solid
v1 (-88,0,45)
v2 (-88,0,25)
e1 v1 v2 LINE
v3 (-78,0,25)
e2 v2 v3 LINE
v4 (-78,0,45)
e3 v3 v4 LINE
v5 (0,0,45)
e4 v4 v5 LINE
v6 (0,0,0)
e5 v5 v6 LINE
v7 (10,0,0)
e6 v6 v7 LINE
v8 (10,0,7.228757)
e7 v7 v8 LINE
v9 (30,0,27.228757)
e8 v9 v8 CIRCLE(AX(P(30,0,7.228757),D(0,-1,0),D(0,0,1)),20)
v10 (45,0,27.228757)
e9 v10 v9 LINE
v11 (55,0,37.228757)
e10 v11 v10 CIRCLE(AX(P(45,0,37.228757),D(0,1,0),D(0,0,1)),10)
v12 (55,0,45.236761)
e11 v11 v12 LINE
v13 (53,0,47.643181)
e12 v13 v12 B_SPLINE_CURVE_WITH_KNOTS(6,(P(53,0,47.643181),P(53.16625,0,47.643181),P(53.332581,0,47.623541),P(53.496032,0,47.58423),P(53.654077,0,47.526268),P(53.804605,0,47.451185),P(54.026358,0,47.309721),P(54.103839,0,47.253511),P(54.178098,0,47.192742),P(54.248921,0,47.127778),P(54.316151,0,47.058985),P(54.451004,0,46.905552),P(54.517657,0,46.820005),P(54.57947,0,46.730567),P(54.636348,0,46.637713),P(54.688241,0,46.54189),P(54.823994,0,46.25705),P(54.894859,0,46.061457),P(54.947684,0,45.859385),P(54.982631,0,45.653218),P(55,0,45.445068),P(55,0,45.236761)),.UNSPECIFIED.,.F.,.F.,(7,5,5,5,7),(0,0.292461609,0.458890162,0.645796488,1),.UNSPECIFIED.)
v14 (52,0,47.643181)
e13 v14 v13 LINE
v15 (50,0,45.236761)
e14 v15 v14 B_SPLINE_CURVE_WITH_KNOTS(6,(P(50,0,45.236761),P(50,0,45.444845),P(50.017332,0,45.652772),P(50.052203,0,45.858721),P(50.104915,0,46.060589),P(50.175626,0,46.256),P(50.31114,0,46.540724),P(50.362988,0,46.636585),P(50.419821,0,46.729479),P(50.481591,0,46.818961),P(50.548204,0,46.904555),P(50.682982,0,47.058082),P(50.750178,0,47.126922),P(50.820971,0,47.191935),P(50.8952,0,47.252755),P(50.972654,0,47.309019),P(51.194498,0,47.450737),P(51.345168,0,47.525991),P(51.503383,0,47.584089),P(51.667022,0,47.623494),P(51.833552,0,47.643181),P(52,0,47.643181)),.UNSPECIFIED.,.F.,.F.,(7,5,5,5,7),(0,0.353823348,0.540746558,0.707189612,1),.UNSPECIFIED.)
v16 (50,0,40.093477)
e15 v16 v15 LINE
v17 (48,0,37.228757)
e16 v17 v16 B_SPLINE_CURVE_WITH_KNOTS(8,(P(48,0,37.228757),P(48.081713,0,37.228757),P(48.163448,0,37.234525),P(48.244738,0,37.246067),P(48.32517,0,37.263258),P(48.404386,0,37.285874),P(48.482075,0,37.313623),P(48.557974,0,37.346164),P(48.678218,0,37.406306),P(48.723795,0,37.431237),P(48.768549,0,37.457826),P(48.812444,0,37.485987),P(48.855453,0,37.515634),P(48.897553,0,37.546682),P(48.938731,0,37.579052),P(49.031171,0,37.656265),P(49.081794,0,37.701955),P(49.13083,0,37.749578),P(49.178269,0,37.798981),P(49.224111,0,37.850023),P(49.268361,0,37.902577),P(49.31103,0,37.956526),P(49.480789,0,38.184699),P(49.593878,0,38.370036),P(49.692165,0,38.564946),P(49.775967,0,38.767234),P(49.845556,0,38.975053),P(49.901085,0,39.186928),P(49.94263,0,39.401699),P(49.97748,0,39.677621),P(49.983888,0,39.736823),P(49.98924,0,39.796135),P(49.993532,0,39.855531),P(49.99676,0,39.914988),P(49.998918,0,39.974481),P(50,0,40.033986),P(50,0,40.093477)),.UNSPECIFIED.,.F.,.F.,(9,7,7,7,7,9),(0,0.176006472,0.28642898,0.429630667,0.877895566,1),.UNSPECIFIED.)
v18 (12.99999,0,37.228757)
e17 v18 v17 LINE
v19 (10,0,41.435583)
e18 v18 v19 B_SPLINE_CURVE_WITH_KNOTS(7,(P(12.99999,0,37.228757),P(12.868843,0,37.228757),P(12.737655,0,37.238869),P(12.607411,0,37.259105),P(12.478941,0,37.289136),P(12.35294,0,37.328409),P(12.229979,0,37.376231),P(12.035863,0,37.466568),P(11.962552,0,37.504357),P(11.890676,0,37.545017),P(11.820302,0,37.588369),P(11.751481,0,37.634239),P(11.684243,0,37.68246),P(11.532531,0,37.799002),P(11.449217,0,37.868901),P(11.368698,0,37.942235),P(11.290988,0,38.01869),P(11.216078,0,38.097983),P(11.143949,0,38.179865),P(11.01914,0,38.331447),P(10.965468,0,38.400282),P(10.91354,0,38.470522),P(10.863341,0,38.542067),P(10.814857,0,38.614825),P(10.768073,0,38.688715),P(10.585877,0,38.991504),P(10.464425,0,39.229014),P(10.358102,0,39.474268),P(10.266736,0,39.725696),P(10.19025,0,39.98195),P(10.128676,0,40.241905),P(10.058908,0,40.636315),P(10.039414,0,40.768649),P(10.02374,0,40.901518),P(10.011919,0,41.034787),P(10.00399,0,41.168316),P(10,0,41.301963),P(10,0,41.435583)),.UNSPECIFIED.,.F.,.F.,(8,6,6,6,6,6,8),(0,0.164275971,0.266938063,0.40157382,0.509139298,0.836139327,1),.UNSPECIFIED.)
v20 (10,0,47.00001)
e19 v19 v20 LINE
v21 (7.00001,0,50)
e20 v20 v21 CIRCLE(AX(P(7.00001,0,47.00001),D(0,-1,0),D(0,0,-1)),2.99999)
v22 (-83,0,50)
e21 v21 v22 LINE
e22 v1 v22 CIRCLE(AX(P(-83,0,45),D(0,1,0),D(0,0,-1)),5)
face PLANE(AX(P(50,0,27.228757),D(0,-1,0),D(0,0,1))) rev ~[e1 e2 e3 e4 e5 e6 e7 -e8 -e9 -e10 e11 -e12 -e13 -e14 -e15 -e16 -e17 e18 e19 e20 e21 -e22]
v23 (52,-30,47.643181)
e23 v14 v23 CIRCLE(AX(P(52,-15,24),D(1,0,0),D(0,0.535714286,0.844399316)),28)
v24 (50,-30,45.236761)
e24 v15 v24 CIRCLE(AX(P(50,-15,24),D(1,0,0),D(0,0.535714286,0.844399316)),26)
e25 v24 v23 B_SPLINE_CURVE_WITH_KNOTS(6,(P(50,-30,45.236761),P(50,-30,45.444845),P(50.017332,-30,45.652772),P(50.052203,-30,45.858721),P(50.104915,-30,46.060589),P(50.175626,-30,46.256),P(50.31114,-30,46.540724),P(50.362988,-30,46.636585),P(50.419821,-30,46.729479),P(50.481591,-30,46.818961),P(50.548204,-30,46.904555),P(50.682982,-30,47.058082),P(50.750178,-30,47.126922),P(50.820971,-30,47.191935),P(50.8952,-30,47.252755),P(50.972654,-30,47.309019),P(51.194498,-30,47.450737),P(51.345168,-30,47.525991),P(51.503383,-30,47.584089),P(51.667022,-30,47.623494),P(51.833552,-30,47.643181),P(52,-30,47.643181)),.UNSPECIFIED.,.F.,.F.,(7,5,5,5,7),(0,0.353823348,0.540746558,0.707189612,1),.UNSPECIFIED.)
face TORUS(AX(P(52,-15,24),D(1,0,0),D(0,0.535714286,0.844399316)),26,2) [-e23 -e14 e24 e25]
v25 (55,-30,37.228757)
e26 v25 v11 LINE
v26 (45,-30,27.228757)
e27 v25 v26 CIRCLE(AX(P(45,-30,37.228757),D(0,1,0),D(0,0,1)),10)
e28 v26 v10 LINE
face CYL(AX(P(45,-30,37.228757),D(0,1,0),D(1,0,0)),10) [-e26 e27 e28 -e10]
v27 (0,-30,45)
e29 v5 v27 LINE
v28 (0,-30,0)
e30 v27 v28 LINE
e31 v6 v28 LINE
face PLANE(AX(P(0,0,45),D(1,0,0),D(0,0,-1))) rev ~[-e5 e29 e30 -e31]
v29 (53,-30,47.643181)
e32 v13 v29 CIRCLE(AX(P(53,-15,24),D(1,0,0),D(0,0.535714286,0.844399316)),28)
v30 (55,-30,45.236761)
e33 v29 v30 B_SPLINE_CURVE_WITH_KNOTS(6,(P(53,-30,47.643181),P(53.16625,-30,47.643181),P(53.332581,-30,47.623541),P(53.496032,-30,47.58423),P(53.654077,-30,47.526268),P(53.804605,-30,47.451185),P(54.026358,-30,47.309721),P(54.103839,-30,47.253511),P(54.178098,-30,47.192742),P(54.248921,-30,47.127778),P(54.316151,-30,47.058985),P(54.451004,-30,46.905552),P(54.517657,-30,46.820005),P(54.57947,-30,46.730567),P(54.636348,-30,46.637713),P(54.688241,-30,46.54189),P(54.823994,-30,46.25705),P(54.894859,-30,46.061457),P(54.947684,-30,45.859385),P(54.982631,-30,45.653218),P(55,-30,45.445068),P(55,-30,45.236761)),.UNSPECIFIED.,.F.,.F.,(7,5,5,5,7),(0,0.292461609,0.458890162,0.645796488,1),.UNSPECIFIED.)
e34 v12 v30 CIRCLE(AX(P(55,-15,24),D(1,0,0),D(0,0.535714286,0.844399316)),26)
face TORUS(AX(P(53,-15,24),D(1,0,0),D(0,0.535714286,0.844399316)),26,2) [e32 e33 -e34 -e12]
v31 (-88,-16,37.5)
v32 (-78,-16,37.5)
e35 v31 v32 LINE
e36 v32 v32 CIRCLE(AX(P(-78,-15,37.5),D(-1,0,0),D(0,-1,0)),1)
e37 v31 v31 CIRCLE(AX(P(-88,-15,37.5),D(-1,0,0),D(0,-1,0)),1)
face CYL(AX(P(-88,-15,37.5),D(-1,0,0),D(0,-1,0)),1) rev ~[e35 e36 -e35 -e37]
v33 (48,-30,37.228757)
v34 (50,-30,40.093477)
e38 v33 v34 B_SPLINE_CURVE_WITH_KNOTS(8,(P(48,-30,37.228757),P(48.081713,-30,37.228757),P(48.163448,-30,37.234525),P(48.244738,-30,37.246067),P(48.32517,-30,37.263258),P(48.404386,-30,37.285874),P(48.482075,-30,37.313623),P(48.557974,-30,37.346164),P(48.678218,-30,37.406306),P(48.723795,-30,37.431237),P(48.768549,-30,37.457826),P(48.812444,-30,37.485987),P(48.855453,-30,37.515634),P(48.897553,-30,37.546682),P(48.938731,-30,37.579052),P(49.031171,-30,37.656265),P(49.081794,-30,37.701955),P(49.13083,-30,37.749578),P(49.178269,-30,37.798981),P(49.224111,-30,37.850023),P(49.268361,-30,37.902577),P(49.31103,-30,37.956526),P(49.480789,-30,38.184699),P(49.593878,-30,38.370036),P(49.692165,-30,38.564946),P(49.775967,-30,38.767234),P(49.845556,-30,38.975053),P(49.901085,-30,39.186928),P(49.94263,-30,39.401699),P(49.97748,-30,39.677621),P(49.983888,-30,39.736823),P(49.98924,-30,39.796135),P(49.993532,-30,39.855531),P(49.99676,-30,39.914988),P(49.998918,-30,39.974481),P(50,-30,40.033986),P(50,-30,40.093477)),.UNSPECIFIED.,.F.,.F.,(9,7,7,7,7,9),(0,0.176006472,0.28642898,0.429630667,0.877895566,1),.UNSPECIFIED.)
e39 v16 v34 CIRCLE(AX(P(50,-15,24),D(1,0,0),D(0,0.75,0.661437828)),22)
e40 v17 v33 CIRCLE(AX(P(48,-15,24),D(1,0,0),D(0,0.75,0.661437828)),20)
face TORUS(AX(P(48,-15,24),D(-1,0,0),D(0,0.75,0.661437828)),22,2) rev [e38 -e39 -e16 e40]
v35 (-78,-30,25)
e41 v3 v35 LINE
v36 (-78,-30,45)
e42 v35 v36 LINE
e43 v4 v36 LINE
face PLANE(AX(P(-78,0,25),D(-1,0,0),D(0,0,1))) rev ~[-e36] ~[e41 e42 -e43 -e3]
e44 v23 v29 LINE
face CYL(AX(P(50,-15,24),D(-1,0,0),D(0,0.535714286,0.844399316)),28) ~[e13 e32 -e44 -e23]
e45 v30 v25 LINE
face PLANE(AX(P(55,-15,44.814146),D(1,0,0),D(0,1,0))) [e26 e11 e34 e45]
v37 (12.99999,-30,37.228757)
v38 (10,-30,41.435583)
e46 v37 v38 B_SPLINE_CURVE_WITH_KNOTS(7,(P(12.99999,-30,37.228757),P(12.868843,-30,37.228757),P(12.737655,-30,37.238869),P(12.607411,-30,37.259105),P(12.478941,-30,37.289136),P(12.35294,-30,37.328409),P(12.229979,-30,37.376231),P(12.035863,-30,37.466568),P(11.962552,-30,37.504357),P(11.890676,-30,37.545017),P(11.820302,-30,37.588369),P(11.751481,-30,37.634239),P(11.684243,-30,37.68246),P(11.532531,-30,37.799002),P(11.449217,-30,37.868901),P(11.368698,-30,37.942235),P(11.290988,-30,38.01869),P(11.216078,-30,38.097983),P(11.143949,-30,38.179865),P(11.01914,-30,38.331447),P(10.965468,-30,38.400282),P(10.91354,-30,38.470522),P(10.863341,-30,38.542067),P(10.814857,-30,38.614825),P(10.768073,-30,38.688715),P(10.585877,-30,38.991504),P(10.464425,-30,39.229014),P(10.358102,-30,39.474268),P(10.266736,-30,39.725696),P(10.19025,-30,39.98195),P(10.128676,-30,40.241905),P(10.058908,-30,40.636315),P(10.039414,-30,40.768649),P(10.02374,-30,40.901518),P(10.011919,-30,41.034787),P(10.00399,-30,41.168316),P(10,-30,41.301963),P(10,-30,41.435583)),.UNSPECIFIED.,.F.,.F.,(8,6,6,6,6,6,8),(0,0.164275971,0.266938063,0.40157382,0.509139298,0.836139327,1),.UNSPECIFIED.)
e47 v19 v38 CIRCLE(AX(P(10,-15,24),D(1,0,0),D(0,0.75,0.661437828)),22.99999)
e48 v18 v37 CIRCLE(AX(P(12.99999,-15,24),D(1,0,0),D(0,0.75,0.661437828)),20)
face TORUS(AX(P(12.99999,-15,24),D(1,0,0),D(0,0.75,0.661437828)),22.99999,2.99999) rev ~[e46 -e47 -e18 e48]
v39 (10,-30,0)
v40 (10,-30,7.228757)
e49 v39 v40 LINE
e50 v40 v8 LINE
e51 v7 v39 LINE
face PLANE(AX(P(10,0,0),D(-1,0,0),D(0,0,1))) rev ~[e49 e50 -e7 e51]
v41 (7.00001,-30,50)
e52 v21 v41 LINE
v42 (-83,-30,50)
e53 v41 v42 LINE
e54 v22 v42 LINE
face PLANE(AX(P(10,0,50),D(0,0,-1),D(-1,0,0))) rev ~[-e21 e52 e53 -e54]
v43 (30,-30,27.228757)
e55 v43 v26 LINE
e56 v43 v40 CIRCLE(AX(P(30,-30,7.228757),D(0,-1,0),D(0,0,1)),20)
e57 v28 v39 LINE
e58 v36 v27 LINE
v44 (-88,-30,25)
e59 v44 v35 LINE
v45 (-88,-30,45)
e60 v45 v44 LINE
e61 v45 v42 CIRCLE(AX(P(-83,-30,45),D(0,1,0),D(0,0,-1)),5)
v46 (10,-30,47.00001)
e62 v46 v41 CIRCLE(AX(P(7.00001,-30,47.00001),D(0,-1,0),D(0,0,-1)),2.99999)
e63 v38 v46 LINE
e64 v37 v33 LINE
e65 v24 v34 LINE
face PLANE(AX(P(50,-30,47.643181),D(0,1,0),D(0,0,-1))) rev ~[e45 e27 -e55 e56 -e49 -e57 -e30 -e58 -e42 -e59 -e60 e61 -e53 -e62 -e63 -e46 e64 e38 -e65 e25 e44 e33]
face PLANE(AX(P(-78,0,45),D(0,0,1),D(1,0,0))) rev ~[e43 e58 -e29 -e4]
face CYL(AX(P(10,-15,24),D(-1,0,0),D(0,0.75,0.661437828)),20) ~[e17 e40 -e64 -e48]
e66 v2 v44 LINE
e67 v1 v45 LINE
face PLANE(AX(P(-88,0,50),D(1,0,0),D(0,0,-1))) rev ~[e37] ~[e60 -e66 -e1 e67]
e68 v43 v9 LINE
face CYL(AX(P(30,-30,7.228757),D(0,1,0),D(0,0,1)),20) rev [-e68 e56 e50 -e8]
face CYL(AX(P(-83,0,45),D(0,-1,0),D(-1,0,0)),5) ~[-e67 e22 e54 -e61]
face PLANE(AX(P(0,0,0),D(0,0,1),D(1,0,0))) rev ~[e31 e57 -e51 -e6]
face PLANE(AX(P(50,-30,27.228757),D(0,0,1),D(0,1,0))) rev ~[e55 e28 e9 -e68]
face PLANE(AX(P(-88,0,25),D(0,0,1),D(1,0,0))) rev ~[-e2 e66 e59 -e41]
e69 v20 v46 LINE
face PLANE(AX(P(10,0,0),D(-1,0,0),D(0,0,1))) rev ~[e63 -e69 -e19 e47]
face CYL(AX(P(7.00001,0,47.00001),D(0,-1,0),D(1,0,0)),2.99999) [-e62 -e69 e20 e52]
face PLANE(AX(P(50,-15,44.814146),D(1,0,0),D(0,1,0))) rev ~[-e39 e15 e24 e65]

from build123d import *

# Parameters (mm, degrees)
F1_DEPTH = 30
F2_R     = 1
F3_DEPTH = 10
F5_DEPTH = 40
F7_DEPTH = 5
F8_R     = 20
F9_R     = 2.99999
F10_R    = 2
F11_R    = 10
F12_R    = 5


# Not quite as in the source:
# - a fillet or chamfer is up to 0.001 mm smaller than in the source, because OpenCascade refuses the exact size


with BuildPart() as f1:
    # F0 (on Front) → F1 (new body)
    with BuildSketch(Plane.XZ):
        Polygon((0, 45), (0, 0), (10, 0), (10, 50), (-88, 50), (-88, 25), (-78, 25), (-78, 45), align=None)
    extrude(amount=F1_DEPTH)

    # F2 (on face) → F3 (cut, through all)
    with BuildSketch(Plane(origin=(-88, 0, 0), x_dir=(0, -1, 0), z_dir=(-1, 0, 0))):
        with Locations((15, 37.5)):
            Circle(F2_R)
    extrude(amount=-F3_DEPTH, mode=Mode.SUBTRACT)

    # F4 (on face) → F5 (join)
    with BuildSketch(Plane.YZ.offset(10)):
        with BuildLine():
            Line((0, 27.2287565553), (0, 37.2287565553))
            ThreePointArc((0, 37.2287565553), (-15, 44), (-30, 37.2287565553))
            Line((-30, 37.2287565553), (-30, 27.2287565553))
            Line((-30, 27.2287565553), (0, 27.2287565553))
        make_face()
    extrude(amount=F5_DEPTH)

    # F6 (on face) → F7 (join)
    with BuildSketch(Plane.YZ.offset(50)):
        with BuildLine():
            Line((0, 37.2287565553), (0, 47.6431808351))
            ThreePointArc((0, 47.6431808351), (-15, 52), (-30, 47.6431808351))
            Line((-30, 47.6431808351), (-30, 37.2287565553))
            ThreePointArc((-30, 37.2287565553), (-15, 44), (0, 37.2287565553))
        make_face()
        with BuildLine():
            Line((0, 27.2287565553), (0, 37.2287565553))
            ThreePointArc((0, 37.2287565553), (-15, 44), (-30, 37.2287565553))
            Line((-30, 37.2287565553), (-30, 27.2287565553))
            Line((-30, 27.2287565553), (0, 27.2287565553))
        make_face()
    extrude(amount=F7_DEPTH)

    # F8
    f8_edges = [f1.edges().sort_by_distance(p)[0] for p in [
        (10, -15, 27.228757),
    ]]
    fillet(f8_edges, radius=F8_R)

    # F9 (radius 3 in the source; OpenCascade refuses exactly that, so slightly less here)
    f9_edges = [f1.edges().sort_by_distance(p)[0] for p in [
        (10, -15, 44),
        (10, -15, 50),
    ]]
    fillet(f9_edges, radius=F9_R)

    # F10
    f10_edges = [f1.edges().sort_by_distance(p)[0] for p in [
        (50, -15, 44),
        (50, -15, 52),
        (55, -15, 52),
    ]]
    fillet(f10_edges, radius=F10_R)

    # F11
    f11_edges = [f1.edges().sort_by_distance(p)[0] for p in [
        (55, -15, 27.228757),
    ]]
    fillet(f11_edges, radius=F11_R)

    # F12
    f12_edges = [f1.edges().sort_by_distance(p)[0] for p in [
        (-88, -15, 50),
    ]]
    fillet(f12_edges, radius=F12_R)


solid = f1.part
